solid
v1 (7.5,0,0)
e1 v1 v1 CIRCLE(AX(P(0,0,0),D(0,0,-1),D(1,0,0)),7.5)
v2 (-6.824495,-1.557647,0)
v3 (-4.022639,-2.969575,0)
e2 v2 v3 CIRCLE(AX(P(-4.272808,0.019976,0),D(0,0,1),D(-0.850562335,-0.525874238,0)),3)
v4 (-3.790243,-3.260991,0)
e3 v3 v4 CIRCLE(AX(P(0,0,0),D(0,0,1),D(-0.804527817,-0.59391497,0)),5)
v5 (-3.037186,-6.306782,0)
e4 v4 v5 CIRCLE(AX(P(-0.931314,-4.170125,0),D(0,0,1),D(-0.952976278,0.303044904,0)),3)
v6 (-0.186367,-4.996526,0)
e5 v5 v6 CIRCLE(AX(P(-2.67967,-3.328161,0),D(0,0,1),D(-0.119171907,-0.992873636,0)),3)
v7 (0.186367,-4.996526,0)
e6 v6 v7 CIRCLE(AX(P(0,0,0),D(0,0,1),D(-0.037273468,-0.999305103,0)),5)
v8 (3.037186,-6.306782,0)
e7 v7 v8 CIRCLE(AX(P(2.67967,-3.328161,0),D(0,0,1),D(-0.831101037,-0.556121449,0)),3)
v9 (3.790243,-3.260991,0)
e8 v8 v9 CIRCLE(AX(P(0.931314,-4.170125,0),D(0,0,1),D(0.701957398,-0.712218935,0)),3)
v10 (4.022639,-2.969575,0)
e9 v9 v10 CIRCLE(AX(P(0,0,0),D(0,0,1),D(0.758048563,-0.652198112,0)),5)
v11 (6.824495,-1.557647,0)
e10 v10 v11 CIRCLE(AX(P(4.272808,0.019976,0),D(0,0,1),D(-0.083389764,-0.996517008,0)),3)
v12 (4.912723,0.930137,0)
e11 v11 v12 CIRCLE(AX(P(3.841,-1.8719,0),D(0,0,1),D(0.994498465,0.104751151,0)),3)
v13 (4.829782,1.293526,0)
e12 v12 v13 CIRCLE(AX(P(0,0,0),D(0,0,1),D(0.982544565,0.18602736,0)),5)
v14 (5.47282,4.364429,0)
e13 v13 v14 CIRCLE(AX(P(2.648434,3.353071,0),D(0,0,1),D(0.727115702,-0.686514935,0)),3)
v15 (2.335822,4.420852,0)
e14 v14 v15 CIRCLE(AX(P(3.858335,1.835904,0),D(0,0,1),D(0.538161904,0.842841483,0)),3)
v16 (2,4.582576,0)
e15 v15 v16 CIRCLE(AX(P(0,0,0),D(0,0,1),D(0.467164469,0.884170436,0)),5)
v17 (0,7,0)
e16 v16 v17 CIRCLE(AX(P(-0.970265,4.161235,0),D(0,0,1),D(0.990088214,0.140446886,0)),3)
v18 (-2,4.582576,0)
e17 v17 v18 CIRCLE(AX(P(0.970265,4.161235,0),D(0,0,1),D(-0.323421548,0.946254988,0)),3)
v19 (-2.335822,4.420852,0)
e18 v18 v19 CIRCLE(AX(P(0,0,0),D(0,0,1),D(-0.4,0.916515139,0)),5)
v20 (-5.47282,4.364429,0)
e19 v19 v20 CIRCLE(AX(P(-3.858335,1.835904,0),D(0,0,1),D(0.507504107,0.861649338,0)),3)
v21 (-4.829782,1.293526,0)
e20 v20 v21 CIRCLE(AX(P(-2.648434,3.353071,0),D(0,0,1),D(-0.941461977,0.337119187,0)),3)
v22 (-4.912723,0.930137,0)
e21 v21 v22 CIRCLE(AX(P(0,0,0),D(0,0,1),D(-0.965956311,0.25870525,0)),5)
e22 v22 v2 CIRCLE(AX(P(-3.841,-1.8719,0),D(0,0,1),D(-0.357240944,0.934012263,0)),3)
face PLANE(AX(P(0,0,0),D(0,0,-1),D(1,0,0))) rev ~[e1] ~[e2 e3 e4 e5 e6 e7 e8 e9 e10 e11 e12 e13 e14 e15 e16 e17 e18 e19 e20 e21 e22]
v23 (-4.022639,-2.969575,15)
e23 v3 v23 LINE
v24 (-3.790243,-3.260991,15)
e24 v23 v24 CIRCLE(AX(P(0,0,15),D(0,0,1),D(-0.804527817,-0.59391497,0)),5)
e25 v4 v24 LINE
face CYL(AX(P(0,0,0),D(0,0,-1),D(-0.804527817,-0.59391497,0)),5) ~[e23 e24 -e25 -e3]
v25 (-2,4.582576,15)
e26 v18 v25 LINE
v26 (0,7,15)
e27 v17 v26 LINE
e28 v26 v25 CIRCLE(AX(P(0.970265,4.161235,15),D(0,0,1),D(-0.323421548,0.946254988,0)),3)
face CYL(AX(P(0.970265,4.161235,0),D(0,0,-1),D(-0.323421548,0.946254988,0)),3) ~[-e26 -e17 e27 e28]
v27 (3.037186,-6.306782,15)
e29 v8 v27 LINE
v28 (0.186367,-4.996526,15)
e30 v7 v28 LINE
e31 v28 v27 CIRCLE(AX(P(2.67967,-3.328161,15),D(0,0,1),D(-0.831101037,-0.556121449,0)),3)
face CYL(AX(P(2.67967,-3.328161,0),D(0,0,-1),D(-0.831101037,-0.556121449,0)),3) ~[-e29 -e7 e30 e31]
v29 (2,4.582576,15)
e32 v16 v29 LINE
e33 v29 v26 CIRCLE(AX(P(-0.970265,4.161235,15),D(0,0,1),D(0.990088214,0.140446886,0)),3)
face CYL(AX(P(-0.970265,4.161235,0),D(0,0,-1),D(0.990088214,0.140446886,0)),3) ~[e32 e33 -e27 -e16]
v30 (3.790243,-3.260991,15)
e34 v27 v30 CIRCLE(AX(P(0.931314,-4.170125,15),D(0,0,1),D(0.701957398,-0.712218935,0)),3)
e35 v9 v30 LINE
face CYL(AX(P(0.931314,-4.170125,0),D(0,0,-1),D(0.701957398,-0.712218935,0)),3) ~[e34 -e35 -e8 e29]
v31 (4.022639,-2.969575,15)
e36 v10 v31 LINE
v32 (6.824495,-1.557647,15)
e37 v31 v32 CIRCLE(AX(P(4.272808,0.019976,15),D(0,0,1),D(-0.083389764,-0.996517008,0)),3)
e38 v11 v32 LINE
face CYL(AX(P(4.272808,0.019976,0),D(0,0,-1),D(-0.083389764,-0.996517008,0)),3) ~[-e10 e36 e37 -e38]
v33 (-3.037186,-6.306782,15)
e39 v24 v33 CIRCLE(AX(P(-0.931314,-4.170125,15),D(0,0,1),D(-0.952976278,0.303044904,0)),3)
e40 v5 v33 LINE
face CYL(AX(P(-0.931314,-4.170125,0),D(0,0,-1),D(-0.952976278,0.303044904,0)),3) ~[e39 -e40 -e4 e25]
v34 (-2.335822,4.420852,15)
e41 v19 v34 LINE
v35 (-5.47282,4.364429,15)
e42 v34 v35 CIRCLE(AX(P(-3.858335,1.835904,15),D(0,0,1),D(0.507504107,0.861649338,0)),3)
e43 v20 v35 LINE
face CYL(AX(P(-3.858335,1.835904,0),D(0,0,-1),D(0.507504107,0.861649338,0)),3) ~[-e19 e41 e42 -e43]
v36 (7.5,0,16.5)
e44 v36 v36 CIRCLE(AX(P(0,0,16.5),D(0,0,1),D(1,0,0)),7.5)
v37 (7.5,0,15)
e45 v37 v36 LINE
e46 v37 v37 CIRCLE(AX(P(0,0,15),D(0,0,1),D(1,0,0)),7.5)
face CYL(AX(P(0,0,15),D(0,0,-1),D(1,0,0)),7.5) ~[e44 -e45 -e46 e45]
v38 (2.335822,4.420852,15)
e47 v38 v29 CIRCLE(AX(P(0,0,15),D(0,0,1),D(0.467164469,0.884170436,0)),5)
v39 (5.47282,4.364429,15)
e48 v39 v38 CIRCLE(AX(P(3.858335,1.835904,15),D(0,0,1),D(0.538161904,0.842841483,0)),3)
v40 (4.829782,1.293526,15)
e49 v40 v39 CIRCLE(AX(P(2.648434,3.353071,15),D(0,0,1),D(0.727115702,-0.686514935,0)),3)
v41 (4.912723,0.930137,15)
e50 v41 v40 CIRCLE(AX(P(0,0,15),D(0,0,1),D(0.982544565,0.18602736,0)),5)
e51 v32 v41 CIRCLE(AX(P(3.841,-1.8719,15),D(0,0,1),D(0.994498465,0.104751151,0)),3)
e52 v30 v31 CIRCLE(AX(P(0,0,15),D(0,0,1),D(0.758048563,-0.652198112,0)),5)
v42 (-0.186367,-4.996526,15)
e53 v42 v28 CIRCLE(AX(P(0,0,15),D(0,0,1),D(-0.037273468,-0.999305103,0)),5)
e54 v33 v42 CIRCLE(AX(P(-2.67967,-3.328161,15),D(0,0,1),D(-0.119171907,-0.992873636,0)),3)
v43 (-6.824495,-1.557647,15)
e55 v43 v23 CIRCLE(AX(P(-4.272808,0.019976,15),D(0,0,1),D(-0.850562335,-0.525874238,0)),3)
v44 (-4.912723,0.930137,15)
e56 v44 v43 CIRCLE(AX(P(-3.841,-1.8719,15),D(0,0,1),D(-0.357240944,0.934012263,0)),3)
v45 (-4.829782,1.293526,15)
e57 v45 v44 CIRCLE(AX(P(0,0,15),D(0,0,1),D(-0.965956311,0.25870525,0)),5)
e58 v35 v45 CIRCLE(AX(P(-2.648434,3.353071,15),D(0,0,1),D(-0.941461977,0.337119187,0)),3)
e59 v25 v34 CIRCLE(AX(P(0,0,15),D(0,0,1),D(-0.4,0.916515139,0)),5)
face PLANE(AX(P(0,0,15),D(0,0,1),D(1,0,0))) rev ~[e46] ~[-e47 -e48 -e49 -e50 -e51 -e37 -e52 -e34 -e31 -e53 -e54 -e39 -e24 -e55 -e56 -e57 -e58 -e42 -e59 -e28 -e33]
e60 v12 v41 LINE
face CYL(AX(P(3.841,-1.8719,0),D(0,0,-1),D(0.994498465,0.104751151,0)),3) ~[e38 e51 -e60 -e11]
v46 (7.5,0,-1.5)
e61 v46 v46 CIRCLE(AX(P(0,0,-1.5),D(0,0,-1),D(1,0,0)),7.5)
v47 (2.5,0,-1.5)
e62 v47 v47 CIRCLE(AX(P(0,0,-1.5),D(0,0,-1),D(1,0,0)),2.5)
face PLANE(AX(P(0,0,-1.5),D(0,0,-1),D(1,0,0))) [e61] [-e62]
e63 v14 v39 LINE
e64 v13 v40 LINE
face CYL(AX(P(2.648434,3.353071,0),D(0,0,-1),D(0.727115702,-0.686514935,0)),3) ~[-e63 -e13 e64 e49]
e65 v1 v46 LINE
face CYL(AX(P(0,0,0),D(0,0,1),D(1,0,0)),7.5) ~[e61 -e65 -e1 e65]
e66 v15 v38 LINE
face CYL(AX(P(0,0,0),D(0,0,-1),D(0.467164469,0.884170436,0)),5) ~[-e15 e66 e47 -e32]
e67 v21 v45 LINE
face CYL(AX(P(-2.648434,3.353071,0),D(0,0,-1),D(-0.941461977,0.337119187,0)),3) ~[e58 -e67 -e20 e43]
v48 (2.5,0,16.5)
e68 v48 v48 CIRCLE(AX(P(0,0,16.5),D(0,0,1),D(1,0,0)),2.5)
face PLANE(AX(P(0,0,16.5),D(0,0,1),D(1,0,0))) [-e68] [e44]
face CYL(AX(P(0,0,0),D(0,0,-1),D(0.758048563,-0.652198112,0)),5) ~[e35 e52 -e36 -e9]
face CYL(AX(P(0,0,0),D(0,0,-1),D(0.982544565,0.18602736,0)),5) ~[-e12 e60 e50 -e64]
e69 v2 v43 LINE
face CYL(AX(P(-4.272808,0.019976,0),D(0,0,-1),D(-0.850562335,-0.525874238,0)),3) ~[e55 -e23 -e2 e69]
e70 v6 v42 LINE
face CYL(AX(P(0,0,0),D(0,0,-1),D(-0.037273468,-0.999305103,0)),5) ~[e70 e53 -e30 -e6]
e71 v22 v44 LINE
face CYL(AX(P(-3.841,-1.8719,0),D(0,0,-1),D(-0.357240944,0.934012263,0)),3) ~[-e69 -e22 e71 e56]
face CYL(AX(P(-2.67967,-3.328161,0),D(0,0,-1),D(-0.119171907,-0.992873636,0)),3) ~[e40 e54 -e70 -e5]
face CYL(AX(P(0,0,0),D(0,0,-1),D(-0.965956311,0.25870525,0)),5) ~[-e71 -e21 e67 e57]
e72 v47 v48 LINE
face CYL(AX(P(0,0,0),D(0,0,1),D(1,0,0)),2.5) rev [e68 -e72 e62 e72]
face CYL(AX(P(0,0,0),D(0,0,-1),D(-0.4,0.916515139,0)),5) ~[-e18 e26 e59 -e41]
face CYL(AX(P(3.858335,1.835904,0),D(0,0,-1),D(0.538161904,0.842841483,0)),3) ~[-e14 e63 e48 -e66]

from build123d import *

# Parameters (mm, degrees)
F0_R     = 2.5
F1_DEPTH = 15
F2_R     = 7.5
F2_R_2   = 2.5
F3_DEPTH = 1.5
F4_R     = 7.5
F4_R_2   = 2.5
F5_DEPTH = 1.5


with BuildPart() as f1:
    # F0 (on Top) → F1 (new body)
    with BuildSketch(Plane.XY):
        with BuildLine():
            ThreePointArc((0, 7), (-1.3412127701, 6.0735823287), (-2, 4.582575695))
            ThreePointArc((-2, 4.582575695), (-2.1694186956, 4.5048443395), (-2.3358223454, 4.420852177))
            ThreePointArc((-2.3358223454, 4.420852177), (-3.9122853917, 4.8354190111), (-5.4728203773, 4.364428613))
            ThreePointArc((-5.4728203773, 4.364428613), (-5.5847503602, 2.7382142744), (-4.8297815528, 1.2935262471))
            ThreePointArc((-4.8297815528, 1.2935262471), (-4.8746395609, 1.1126046698), (-4.9127228226, 0.9301368008))
            ThreePointArc((-4.9127228226, 0.9301368008), (-6.2197528574, -0.0439134465), (-6.8244953853, -1.5576465377))
            ThreePointArc((-6.8244953853, -1.5576465377), (-5.622857021, -2.659084978), (-4.0226390868, -2.9695748479))
            ThreePointArc((-4.0226390868, -2.9695748479), (-3.9091574123, -3.1174490093), (-3.7902428131, -3.2609905577))
            ThreePointArc((-3.7902428131, -3.2609905577), (-3.8436195617, -4.8901781832), (-3.0371861738, -6.3067820753))
            ThreePointArc((-3.0371861738, -6.3067820753), (-1.4268376596, -6.0540390065), (-0.1863673415, -4.9965255142))
            ThreePointArc((-0.1863673415, -4.9965255142), (0, -5), (0.1863673415, -4.9965255142))
            ThreePointArc((0.1863673415, -4.9965255142), (1.4268376596, -6.0540390065), (3.0371861738, -6.3067820753))
            ThreePointArc((3.0371861738, -6.3067820753), (3.8436195617, -4.8901781832), (3.7902428131, -3.2609905577))
            ThreePointArc((3.7902428131, -3.2609905577), (3.9091574123, -3.1174490093), (4.0226390868, -2.9695748479))
            ThreePointArc((4.0226390868, -2.9695748479), (5.622857021, -2.659084978), (6.8244953853, -1.5576465377))
            ThreePointArc((6.8244953853, -1.5576465377), (6.2197528574, -0.0439134465), (4.9127228226, 0.9301368008))
            ThreePointArc((4.9127228226, 0.9301368008), (4.8746395609, 1.1126046698), (4.8297815528, 1.2935262471))
            ThreePointArc((4.8297815528, 1.2935262471), (5.5847503602, 2.7382142744), (5.4728203773, 4.364428613))
            ThreePointArc((5.4728203773, 4.364428613), (3.9122853917, 4.8354190111), (2.3358223454, 4.420852177))
            ThreePointArc((2.3358223454, 4.420852177), (2.1694186956, 4.5048443395), (2, 4.582575695))
            ThreePointArc((2, 4.582575695), (1.3412127701, 6.0735823287), (0, 7))
        make_face()
        Circle(F0_R, mode=Mode.SUBTRACT)
    extrude(amount=F1_DEPTH)

    # F2 (on face) → F3 (join)
    with BuildSketch(Plane.XY.offset(15)):
        Circle(F2_R)
        with BuildLine():
            ThreePointArc((4.8297815528, 1.2935262471), (4.8746395609, 1.1126046698), (4.9127228226, 0.9301368008))
            ThreePointArc((4.9127228226, 0.9301368008), (6.2197528574, -0.0439134465), (6.8244953853, -1.5576465377))
            ThreePointArc((6.8244953853, -1.5576465377), (5.622857021, -2.659084978), (4.0226390868, -2.9695748479))
            ThreePointArc((4.0226390868, -2.9695748479), (3.9091574123, -3.1174490093), (3.7902428131, -3.2609905577))
            ThreePointArc((3.7902428131, -3.2609905577), (3.8436195617, -4.8901781832), (3.0371861738, -6.3067820753))
            ThreePointArc((3.0371861738, -6.3067820753), (1.4268376596, -6.0540390065), (0.1863673415, -4.9965255142))
            ThreePointArc((0.1863673415, -4.9965255142), (0, -5), (-0.1863673415, -4.9965255142))
            ThreePointArc((-0.1863673415, -4.9965255142), (-1.4268376596, -6.0540390065), (-3.0371861738, -6.3067820753))
            ThreePointArc((-3.0371861738, -6.3067820753), (-3.8436195617, -4.8901781832), (-3.7902428131, -3.2609905577))
            ThreePointArc((-3.7902428131, -3.2609905577), (-3.9091574123, -3.1174490093), (-4.0226390868, -2.9695748479))
            ThreePointArc((-4.0226390868, -2.9695748479), (-5.622857021, -2.659084978), (-6.8244953853, -1.5576465377))
            ThreePointArc((-6.8244953853, -1.5576465377), (-6.2197528574, -0.0439134465), (-4.9127228226, 0.9301368008))
            ThreePointArc((-4.9127228226, 0.9301368008), (-4.8746395609, 1.1126046698), (-4.8297815528, 1.2935262471))
            ThreePointArc((-4.8297815528, 1.2935262471), (-5.5847503602, 2.7382142744), (-5.4728203773, 4.364428613))
            ThreePointArc((-5.4728203773, 4.364428613), (-3.9122853917, 4.8354190111), (-2.3358223454, 4.420852177))
            ThreePointArc((-2.3358223454, 4.420852177), (-2.1694186956, 4.5048443395), (-2, 4.582575695))
            ThreePointArc((-2, 4.582575695), (-1.3412127701, 6.0735823287), (0, 7))
            ThreePointArc((0, 7), (1.3412127701, 6.0735823287), (2, 4.582575695))
            ThreePointArc((2, 4.582575695), (2.1694186956, 4.5048443395), (2.3358223454, 4.420852177))
            ThreePointArc((2.3358223454, 4.420852177), (3.9122853917, 4.8354190111), (5.4728203773, 4.364428613))
            ThreePointArc((5.4728203773, 4.364428613), (5.5847503602, 2.7382142744), (4.8297815528, 1.2935262471))
        make_face(mode=Mode.SUBTRACT)
        with BuildLine():
            ThreePointArc((6.8244953853, -1.5576465377), (6.2197528574, -0.0439134465), (4.9127228226, 0.9301368008))
            ThreePointArc((4.9127228226, 0.9301368008), (4.8746395609, 1.1126046698), (4.8297815528, 1.2935262471))
            ThreePointArc((4.8297815528, 1.2935262471), (5.5847503602, 2.7382142744), (5.4728203773, 4.364428613))
            ThreePointArc((5.4728203773, 4.364428613), (3.9122853917, 4.8354190111), (2.3358223454, 4.420852177))
            ThreePointArc((2.3358223454, 4.420852177), (2.1694186956, 4.5048443395), (2, 4.582575695))
            ThreePointArc((2, 4.582575695), (1.3412127701, 6.0735823287), (0, 7))
            ThreePointArc((0, 7), (-1.3412127701, 6.0735823287), (-2, 4.582575695))
            ThreePointArc((-2, 4.582575695), (-2.1694186956, 4.5048443395), (-2.3358223454, 4.420852177))
            ThreePointArc((-2.3358223454, 4.420852177), (-3.9122853917, 4.8354190111), (-5.4728203773, 4.364428613))
            ThreePointArc((-5.4728203773, 4.364428613), (-5.5847503602, 2.7382142744), (-4.8297815528, 1.2935262471))
            ThreePointArc((-4.8297815528, 1.2935262471), (-4.8746395609, 1.1126046698), (-4.9127228226, 0.9301368008))
            ThreePointArc((-4.9127228226, 0.9301368008), (-6.2197528574, -0.0439134465), (-6.8244953853, -1.5576465377))
            ThreePointArc((-6.8244953853, -1.5576465377), (-5.622857021, -2.659084978), (-4.0226390868, -2.9695748479))
            ThreePointArc((-4.0226390868, -2.9695748479), (-3.9091574123, -3.1174490093), (-3.7902428131, -3.2609905577))
            ThreePointArc((-3.7902428131, -3.2609905577), (-3.8436195617, -4.8901781832), (-3.0371861738, -6.3067820753))
            ThreePointArc((-3.0371861738, -6.3067820753), (-1.4268376596, -6.0540390065), (-0.1863673415, -4.9965255142))
            ThreePointArc((-0.1863673415, -4.9965255142), (0, -5), (0.1863673415, -4.9965255142))
            ThreePointArc((0.1863673415, -4.9965255142), (1.4268376596, -6.0540390065), (3.0371861738, -6.3067820753))
            ThreePointArc((3.0371861738, -6.3067820753), (3.8436195617, -4.8901781832), (3.7902428131, -3.2609905577))
            ThreePointArc((3.7902428131, -3.2609905577), (3.9091574123, -3.1174490093), (4.0226390868, -2.9695748479))
            ThreePointArc((4.0226390868, -2.9695748479), (5.622857021, -2.659084978), (6.8244953853, -1.5576465377))
        make_face()
        Circle(F2_R_2, mode=Mode.SUBTRACT)
    extrude(amount=F3_DEPTH)

    # F4 (on face) → F5 (join)
    with BuildSketch(Plane(origin=(0, 0, 0), x_dir=(1, 0, 0), z_dir=(0, 0, -1))):
        Circle(F4_R)
        with BuildLine():
            ThreePointArc((4.9127228226, -0.9301368008), (4.8746395609, -1.1126046698), (4.8297815528, -1.2935262471))
            ThreePointArc((4.8297815528, -1.2935262471), (5.5847503602, -2.7382142744), (5.4728203773, -4.364428613))
            ThreePointArc((5.4728203773, -4.364428613), (3.9122853917, -4.8354190111), (2.3358223454, -4.420852177))
            ThreePointArc((2.3358223454, -4.420852177), (2.1694186956, -4.5048443395), (2, -4.582575695))
            ThreePointArc((2, -4.582575695), (1.3412127701, -6.0735823287), (0, -7))
            ThreePointArc((0, -7), (-1.3412127701, -6.0735823287), (-2, -4.582575695))
            ThreePointArc((-2, -4.582575695), (-2.1694186956, -4.5048443395), (-2.3358223454, -4.420852177))
            ThreePointArc((-2.3358223454, -4.420852177), (-3.9122853917, -4.8354190111), (-5.4728203773, -4.364428613))
            ThreePointArc((-5.4728203773, -4.364428613), (-5.5847503602, -2.7382142744), (-4.8297815528, -1.2935262471))
            ThreePointArc((-4.8297815528, -1.2935262471), (-4.8746395609, -1.1126046698), (-4.9127228226, -0.9301368008))
            ThreePointArc((-4.9127228226, -0.9301368008), (-6.2197528574, 0.0439134465), (-6.8244953853, 1.5576465377))
            ThreePointArc((-6.8244953853, 1.5576465377), (-5.622857021, 2.659084978), (-4.0226390868, 2.9695748479))
            ThreePointArc((-4.0226390868, 2.9695748479), (-3.9091574123, 3.1174490093), (-3.7902428131, 3.2609905577))
            ThreePointArc((-3.7902428131, 3.2609905577), (-3.8436195617, 4.8901781832), (-3.0371861738, 6.3067820753))
            ThreePointArc((-3.0371861738, 6.3067820753), (-1.4268376596, 6.0540390065), (-0.1863673415, 4.9965255142))
            ThreePointArc((-0.1863673415, 4.9965255142), (0, 5), (0.1863673415, 4.9965255142))
            ThreePointArc((0.1863673415, 4.9965255142), (1.4268376596, 6.0540390065), (3.0371861738, 6.3067820753))
            ThreePointArc((3.0371861738, 6.3067820753), (3.8436195617, 4.8901781832), (3.7902428131, 3.2609905577))
            ThreePointArc((3.7902428131, 3.2609905577), (3.9091574123, 3.1174490093), (4.0226390868, 2.9695748479))
            ThreePointArc((4.0226390868, 2.9695748479), (5.622857021, 2.659084978), (6.8244953853, 1.5576465377))
            ThreePointArc((6.8244953853, 1.5576465377), (6.2197528574, 0.0439134465), (4.9127228226, -0.9301368008))
        make_face(mode=Mode.SUBTRACT)
        with BuildLine():
            ThreePointArc((5.4728203773, -4.364428613), (5.5847503602, -2.7382142744), (4.8297815528, -1.2935262471))
            ThreePointArc((4.8297815528, -1.2935262471), (4.8746395609, -1.1126046698), (4.9127228226, -0.9301368008))
            ThreePointArc((4.9127228226, -0.9301368008), (6.2197528574, 0.0439134465), (6.8244953853, 1.5576465377))
            ThreePointArc((6.8244953853, 1.5576465377), (5.622857021, 2.659084978), (4.0226390868, 2.9695748479))
            ThreePointArc((4.0226390868, 2.9695748479), (3.9091574123, 3.1174490093), (3.7902428131, 3.2609905577))
            ThreePointArc((3.7902428131, 3.2609905577), (3.8436195617, 4.8901781832), (3.0371861738, 6.3067820753))
            ThreePointArc((3.0371861738, 6.3067820753), (1.4268376596, 6.0540390065), (0.1863673415, 4.9965255142))
            ThreePointArc((0.1863673415, 4.9965255142), (0, 5), (-0.1863673415, 4.9965255142))
            ThreePointArc((-0.1863673415, 4.9965255142), (-1.4268376596, 6.0540390065), (-3.0371861738, 6.3067820753))
            ThreePointArc((-3.0371861738, 6.3067820753), (-3.8436195617, 4.8901781832), (-3.7902428131, 3.2609905577))
            ThreePointArc((-3.7902428131, 3.2609905577), (-3.9091574123, 3.1174490093), (-4.0226390868, 2.9695748479))
            ThreePointArc((-4.0226390868, 2.9695748479), (-5.622857021, 2.659084978), (-6.8244953853, 1.5576465377))
            ThreePointArc((-6.8244953853, 1.5576465377), (-6.2197528574, 0.0439134465), (-4.9127228226, -0.9301368008))
            ThreePointArc((-4.9127228226, -0.9301368008), (-4.8746395609, -1.1126046698), (-4.8297815528, -1.2935262471))
            ThreePointArc((-4.8297815528, -1.2935262471), (-5.5847503602, -2.7382142744), (-5.4728203773, -4.364428613))
            ThreePointArc((-5.4728203773, -4.364428613), (-3.9122853917, -4.8354190111), (-2.3358223454, -4.420852177))
            ThreePointArc((-2.3358223454, -4.420852177), (-2.1694186956, -4.5048443395), (-2, -4.582575695))
            ThreePointArc((-2, -4.582575695), (-1.3412127701, -6.0735823287), (0, -7))
            ThreePointArc((0, -7), (1.3412127701, -6.0735823287), (2, -4.582575695))
            ThreePointArc((2, -4.582575695), (2.1694186956, -4.5048443395), (2.3358223454, -4.420852177))
            ThreePointArc((2.3358223454, -4.420852177), (3.9122853917, -4.8354190111), (5.4728203773, -4.364428613))
        make_face()
        Circle(F4_R_2, mode=Mode.SUBTRACT)
    extrude(amount=F5_DEPTH)


solid = f1.part
